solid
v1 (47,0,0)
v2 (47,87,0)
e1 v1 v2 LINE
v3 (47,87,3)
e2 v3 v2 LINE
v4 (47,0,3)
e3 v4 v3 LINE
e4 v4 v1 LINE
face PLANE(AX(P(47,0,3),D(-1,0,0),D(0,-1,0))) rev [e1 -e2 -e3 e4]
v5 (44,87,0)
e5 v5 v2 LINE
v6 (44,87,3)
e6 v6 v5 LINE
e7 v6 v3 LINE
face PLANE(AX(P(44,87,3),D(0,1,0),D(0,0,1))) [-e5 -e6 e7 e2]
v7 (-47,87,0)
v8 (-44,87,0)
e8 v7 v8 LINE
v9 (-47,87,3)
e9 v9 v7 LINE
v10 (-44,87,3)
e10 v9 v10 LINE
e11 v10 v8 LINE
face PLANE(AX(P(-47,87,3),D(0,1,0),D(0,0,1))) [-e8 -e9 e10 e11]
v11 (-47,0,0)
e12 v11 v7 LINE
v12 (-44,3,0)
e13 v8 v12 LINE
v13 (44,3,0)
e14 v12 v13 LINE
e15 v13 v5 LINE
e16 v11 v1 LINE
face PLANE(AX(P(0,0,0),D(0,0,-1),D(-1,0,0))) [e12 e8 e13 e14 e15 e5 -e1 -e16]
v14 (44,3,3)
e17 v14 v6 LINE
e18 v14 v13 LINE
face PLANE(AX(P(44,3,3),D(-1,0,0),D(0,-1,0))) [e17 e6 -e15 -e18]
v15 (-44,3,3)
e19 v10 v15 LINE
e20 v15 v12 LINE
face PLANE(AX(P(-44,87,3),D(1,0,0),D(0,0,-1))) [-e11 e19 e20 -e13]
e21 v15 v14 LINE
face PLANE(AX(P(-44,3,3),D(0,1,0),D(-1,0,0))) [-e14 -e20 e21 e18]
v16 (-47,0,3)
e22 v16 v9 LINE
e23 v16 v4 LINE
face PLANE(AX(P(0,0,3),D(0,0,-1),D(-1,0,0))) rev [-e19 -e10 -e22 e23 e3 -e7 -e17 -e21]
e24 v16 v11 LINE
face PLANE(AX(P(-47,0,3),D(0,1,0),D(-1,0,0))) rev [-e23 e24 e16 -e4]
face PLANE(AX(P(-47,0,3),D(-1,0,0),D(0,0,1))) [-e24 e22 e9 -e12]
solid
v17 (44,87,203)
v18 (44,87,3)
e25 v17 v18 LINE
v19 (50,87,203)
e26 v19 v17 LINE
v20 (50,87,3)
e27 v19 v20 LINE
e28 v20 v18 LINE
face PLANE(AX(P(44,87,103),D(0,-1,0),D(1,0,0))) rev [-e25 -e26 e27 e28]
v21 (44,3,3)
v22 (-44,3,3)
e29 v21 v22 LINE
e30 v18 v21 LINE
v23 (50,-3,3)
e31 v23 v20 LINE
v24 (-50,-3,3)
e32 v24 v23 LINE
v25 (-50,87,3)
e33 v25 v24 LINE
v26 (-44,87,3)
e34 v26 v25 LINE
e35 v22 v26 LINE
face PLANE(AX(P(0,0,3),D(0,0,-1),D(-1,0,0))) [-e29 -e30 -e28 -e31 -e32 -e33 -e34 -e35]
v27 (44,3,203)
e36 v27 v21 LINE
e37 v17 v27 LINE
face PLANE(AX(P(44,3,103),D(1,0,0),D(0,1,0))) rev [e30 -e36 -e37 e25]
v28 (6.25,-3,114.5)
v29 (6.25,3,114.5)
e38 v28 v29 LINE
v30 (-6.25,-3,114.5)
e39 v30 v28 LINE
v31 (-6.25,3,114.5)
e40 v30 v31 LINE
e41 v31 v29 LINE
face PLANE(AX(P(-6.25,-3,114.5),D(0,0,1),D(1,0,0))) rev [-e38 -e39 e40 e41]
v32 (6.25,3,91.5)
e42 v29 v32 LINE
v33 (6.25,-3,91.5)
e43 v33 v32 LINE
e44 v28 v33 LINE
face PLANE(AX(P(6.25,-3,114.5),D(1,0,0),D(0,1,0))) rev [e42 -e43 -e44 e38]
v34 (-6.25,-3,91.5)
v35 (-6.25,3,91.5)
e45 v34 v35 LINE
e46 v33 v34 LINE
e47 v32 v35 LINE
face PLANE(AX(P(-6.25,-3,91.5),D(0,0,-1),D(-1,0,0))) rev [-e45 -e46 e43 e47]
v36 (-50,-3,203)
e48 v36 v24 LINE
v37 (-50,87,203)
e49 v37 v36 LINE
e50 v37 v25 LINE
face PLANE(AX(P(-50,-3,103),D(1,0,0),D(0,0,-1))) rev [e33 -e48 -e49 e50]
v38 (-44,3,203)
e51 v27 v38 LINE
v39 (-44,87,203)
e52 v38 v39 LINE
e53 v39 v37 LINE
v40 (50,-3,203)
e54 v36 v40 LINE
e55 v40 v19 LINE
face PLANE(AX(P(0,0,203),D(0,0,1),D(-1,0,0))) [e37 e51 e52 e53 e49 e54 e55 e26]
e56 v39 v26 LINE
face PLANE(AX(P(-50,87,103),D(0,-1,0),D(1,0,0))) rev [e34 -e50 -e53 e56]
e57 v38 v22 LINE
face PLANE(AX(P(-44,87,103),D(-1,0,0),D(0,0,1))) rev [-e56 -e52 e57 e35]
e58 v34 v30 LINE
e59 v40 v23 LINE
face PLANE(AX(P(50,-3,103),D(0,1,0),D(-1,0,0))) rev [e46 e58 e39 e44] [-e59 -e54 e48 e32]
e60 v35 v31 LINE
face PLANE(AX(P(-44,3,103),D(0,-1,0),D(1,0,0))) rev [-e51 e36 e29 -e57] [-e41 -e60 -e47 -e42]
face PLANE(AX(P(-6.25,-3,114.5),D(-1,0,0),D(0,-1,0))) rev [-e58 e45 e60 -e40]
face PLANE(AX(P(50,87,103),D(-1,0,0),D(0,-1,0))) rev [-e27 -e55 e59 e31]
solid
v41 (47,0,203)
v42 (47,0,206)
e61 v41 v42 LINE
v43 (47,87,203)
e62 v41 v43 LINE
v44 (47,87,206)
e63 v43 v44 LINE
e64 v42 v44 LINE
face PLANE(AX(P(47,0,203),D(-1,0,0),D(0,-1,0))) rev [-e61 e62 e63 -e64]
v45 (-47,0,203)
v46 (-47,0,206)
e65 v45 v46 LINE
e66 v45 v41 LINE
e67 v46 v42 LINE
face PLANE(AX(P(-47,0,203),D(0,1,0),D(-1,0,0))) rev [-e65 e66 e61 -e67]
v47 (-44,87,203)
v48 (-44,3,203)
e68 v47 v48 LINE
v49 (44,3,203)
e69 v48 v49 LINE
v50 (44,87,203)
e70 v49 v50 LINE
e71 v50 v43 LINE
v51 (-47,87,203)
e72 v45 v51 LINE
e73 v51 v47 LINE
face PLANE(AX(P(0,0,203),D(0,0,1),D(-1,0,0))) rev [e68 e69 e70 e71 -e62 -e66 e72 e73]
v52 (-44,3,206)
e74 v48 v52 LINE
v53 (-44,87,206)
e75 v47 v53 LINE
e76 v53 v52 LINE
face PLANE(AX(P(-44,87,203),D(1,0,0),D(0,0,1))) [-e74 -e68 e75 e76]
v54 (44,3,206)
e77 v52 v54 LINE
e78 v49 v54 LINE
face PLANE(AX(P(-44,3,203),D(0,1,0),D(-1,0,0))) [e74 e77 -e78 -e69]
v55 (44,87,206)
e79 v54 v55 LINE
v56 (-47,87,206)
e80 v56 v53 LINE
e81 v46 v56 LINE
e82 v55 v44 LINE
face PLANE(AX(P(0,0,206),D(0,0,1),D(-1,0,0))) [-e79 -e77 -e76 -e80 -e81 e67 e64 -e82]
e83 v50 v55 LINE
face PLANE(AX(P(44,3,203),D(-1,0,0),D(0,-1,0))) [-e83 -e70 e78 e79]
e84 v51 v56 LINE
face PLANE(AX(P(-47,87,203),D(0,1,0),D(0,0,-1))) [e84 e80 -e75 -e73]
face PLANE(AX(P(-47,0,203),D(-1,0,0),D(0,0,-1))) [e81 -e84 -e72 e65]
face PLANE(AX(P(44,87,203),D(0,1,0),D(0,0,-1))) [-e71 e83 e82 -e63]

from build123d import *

# Parameters (mm, degrees)
SALIENTE_EXTRUIR1_DEPTH = 3
SALIENTE_EXTRUIR2_DEPTH = 100
SIMETR_A2_START         = -3
SIMETR_A2_OUTLINE_W     = 6
SIMETR_A2_OUTLINE_H     = 100
SIMETR_A2_DEPTH         = 90
SIMETR_A2_2_OUTLINE_W   = 88
SIMETR_A2_2_OUTLINE_H   = 100
SIMETR_A2_2_DEPTH       = 6
CROQUIS3_W              = 12.5
CROQUIS3_H              = 23
CORTAR_EXTRUIR1_DEPTH   = 6


# Read off the part's stored shape, not the designer's step: Simetría2
with BuildPart() as part:
    # Croquis1 → Saliente-Extruir1 (new body)
    with BuildSketch(Plane.XY):
        Polygon((-47, 0), (47, 0), (47, 87), (44, 87), (44, 3), (-44, 3), (-44, 87), (-47, 87), align=None)
    extrude(amount=SALIENTE_EXTRUIR1_DEPTH)


with BuildPart() as body_2:
    # Croquis2 → Saliente-Extruir2 (new body)
    with BuildSketch(Plane.XY.offset(3)):
        Polygon((-44, 87), (-44, 3), (44, 3), (44, 87), (50, 87), (50, -3), (-50, -3), (-50, 87), align=None)
    extrude(amount=SALIENTE_EXTRUIR2_DEPTH)

    # Simetría2 outline → Simetría2 (add)
    with BuildSketch(Plane(origin=(0, 0, 0), x_dir=(1, 0, 0), z_dir=(0, 1, 0)).offset(SIMETR_A2_START)):
        with Locations((-47, -153)):
            Rectangle(SIMETR_A2_OUTLINE_W, SIMETR_A2_OUTLINE_H)
        with Locations((47, -153)):
            Rectangle(SIMETR_A2_OUTLINE_W, SIMETR_A2_OUTLINE_H)
    extrude(amount=SIMETR_A2_DEPTH)

    # Simetr_a2 2 outline → Simetr_a2 2 (add)
    with BuildSketch(Plane(origin=(0, 0, 0), x_dir=(1, 0, 0), z_dir=(0, 1, 0)).offset(SIMETR_A2_START)):
        with Locations((0, -153)):
            Rectangle(SIMETR_A2_2_OUTLINE_W, SIMETR_A2_2_OUTLINE_H)
    extrude(amount=SIMETR_A2_2_DEPTH)

    # Croquis3 → Cortar-Extruir1 (cut)
    with BuildSketch(Plane(origin=(0, 3, 0), x_dir=(1, 0, 0), z_dir=(0, 1, 0))):
        with Locations((0, -103)):
            Rectangle(CROQUIS3_W, CROQUIS3_H)
    extrude(amount=-CORTAR_EXTRUIR1_DEPTH, mode=Mode.SUBTRACT)


with BuildPart() as body_3:
    # Simetría3: mirrored copy
    add(part.part.mirror(Plane.XY.offset(103)))


solid = Compound([part.part, body_2.part, body_3.part])
